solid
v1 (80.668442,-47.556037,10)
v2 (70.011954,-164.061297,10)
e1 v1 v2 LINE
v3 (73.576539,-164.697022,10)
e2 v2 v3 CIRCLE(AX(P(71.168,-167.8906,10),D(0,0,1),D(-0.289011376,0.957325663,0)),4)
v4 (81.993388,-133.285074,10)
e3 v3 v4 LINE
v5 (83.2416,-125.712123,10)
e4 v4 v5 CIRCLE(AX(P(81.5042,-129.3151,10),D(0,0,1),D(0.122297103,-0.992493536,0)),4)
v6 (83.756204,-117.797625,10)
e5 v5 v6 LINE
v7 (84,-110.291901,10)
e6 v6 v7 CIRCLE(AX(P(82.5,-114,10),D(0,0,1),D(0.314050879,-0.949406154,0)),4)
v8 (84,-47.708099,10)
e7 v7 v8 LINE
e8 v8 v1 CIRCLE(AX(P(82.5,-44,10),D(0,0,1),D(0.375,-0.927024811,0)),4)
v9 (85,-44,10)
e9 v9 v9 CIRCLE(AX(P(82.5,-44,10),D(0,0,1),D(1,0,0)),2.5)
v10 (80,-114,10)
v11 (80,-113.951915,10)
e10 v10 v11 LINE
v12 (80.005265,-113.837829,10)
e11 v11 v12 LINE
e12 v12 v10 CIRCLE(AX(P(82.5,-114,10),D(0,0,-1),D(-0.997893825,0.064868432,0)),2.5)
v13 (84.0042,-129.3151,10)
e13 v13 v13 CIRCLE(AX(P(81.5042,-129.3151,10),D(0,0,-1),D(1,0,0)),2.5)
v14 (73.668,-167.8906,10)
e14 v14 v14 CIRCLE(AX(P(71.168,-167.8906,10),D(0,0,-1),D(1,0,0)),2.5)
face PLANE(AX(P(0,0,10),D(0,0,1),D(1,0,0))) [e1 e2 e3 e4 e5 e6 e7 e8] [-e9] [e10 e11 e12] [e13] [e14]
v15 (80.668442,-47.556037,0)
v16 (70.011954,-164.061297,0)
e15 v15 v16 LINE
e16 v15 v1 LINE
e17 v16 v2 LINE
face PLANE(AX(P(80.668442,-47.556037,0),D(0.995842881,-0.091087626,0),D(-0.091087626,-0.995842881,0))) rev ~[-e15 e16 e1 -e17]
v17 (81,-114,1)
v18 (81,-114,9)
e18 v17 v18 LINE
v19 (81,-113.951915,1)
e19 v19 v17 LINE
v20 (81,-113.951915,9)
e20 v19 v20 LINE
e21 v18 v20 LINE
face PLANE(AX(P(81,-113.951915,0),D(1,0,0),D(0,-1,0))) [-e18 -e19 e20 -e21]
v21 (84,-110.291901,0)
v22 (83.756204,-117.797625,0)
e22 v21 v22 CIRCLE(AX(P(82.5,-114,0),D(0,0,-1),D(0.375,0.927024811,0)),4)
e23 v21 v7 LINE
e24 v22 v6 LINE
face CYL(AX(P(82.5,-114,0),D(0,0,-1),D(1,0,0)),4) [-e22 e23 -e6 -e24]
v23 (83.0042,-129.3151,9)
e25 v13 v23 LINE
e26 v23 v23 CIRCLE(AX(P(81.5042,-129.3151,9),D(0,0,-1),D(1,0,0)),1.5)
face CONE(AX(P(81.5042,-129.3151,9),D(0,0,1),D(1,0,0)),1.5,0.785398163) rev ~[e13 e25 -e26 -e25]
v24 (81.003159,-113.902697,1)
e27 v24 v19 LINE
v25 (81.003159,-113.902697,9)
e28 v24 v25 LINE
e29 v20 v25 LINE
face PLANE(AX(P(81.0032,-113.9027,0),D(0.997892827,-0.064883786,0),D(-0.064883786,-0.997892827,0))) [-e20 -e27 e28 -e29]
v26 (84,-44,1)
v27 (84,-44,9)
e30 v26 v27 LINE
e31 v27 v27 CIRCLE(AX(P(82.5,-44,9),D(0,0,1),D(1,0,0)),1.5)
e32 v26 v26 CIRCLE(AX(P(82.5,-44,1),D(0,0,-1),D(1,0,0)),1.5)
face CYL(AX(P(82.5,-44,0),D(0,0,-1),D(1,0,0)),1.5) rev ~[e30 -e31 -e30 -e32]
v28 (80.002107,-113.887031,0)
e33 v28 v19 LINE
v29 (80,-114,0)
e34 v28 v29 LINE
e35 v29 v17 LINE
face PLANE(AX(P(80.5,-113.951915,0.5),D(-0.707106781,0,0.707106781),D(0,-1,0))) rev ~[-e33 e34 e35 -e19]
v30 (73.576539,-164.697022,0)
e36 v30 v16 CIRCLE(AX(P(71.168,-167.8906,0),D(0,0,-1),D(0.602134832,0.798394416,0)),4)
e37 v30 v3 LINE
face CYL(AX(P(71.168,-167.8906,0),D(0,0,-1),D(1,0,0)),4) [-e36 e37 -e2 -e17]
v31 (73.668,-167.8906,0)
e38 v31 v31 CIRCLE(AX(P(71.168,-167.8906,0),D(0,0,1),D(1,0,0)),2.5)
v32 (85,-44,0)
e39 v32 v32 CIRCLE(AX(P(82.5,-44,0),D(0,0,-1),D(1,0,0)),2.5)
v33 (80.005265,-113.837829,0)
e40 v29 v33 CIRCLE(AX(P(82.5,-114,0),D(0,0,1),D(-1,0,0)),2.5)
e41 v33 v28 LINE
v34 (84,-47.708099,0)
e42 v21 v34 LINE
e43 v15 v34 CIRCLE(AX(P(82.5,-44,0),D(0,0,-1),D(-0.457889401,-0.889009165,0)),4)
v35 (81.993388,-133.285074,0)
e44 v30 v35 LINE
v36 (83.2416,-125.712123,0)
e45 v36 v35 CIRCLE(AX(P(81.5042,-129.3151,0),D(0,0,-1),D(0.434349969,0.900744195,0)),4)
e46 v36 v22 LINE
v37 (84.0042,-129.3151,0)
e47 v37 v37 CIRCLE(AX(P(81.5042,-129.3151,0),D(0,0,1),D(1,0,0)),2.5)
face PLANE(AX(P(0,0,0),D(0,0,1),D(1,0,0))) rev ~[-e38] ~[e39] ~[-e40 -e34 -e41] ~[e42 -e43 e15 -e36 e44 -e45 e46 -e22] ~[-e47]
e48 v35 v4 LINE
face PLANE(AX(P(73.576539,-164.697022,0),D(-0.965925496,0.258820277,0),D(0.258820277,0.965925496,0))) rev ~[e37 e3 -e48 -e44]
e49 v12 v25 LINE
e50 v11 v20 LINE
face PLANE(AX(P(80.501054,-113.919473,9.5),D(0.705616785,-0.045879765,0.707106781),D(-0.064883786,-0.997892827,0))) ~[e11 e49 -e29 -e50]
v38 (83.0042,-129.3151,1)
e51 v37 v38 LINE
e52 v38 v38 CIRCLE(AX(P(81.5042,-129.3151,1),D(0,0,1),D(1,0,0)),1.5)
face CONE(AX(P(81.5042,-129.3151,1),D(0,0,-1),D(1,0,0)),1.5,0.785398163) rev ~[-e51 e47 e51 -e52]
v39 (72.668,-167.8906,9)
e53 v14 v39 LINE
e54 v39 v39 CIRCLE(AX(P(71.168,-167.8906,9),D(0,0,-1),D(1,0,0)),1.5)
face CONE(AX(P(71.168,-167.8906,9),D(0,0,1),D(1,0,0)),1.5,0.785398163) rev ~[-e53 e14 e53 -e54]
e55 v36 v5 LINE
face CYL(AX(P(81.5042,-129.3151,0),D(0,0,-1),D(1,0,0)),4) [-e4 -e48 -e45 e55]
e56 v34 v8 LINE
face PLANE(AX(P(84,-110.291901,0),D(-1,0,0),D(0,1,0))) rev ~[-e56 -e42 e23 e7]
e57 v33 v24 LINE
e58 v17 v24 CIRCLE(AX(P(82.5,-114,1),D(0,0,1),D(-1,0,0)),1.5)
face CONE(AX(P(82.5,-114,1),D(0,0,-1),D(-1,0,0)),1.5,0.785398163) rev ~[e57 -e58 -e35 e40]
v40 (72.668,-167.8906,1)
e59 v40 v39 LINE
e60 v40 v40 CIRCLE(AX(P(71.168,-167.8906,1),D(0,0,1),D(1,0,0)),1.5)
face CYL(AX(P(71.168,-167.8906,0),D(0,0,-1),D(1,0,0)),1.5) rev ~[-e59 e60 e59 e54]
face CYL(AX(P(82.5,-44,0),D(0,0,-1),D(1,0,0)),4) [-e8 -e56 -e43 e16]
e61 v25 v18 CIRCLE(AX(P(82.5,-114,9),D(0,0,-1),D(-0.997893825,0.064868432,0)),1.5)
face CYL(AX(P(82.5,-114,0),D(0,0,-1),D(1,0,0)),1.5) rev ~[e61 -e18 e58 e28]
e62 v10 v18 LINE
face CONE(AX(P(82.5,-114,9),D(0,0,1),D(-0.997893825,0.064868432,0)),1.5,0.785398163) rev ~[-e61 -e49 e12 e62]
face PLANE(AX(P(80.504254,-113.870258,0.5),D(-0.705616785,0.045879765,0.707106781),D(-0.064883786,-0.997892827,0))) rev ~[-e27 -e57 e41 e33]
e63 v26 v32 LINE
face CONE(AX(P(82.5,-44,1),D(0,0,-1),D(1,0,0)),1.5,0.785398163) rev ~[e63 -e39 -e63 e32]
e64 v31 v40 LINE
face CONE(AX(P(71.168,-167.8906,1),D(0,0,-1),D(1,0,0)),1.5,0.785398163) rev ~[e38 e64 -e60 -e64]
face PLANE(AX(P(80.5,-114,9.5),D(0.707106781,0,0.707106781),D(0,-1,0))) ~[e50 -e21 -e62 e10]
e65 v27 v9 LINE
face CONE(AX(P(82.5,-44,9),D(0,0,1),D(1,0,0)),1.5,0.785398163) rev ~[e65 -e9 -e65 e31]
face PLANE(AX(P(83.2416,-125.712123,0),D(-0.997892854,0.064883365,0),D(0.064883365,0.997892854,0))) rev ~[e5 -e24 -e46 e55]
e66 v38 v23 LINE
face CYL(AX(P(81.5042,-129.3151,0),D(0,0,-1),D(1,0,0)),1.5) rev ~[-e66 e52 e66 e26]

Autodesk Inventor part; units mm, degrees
ref_plane "YZ Plane" through (0, 0, 0) normal (1, 0, 0) x (0, 1, 0)
ref_plane "XZ Plane" through (0, 0, 0) normal (0, 1, 0) x (-1, 0, 0)
ref_plane "XY Plane" through (0, 0, 0) normal (0, 0, 1) x (1, 0, 0)
sketch "Эскиз1" plane through (0, 0, 0) normal (0, 0, 1) x (1, 0, 0)
  circle A0 centre (82.5, -44) radius 1.5 projected
  circle A1 centre (82.5, -114) radius 1.5 projected
  circle A2 centre (81.5042, -129.3151) radius 1.5 projected
  circle A3 centre (71.168, -167.8906) radius 1.5 projected
  line L0 (82.5, -44) -> (82.5, -114) construction
  line L1 (81, -44) -> (81, -114)
  line L2 (84, -114) -> (84, -44)
  arc A4 (84, -44) -> (81, -44) centre (82.5, -44) ccw
  arc A5 (81, -114) -> (84, -114) centre (82.5, -114) ccw
  line L3 (82.5, -114) -> (81.5042, -129.3151) construction
  line L4 (81.0032, -113.9027) -> (80.0074, -129.2178)
  line L5 (83.001, -129.4125) -> (83.9968, -114.0973)
  arc A6 (83.9968, -114.0973) -> (81.0032, -113.9027) centre (82.5, -114) ccw
  arc A7 (80.0074, -129.2178) -> (83.001, -129.4125) centre (81.5042, -129.3151) ccw
  line L6 (81.5042, -129.3151) -> (71.168, -167.8906) construction
  line L7 (80.0553, -128.9269) -> (69.7191, -167.5023)
  line L8 (72.6168, -168.2788) -> (82.9531, -129.7034)
  arc A8 (82.9531, -129.7034) -> (80.0553, -128.9269) centre (81.5042, -129.3151) ccw
  arc A9 (69.7191, -167.5023) -> (72.6168, -168.2788) centre (71.168, -167.8906) ccw
  line L9 (82.5, -44) -> (71.168, -167.8906) construction
  line L10 (81.0062, -43.8634) -> (69.6742, -167.7539)
  line L11 (72.6617, -168.0272) -> (83.9938, -44.1366)
  arc A10 (83.9938, -44.1366) -> (81.0062, -43.8634) centre (82.5, -44) ccw
  arc A11 (69.6742, -167.7539) -> (72.6617, -168.0272) centre (71.168, -167.8906) ccw
  circle A12 centre (82.5, -44) radius 4
  circle A13 centre (82.5, -114) radius 4
  circle A14 centre (81.5042, -129.3151) radius 4
  circle A15 centre (71.168, -167.8906) radius 4
  point P0 (0, 0)
  point P1 (82.5, -79)
  point P2 (82.0021, -121.6576)
  point P3 (76.3361, -148.6029)
  point P4 (76.834, -105.9453)
  point P5 (84, -47.7081)
  point P6 (80.6685, -47.5561)
  point P7 (70.0119, -164.0613)
  point P8 (73.5766, -164.697)
  point P9 (81.9934, -133.2851)
  point P10 (83.2416, -125.7122)
  point P11 (83.7562, -117.7976)
  point P12 (84, -110.2919)
  dimension "d0" = 1.5
  dimension "d1" = 8
  dimension "d2" = 8
  dimension "d3" = 8
  dimension "d4" = 8
extrude "Выдавливание1" add sketch "Эскиз1" along normal blind 10 contours L2 A12 L11 A0 | A0 L10 A12 L2 | A0 L1 A12 L10 | L11 A12 L1 A0 | L2 A13 L1 L11 A12 | A12 L1 L11 L7 A15 L10 | L11 L1 A12 | A13 L5 A1 L2 | L2 A1 L1 A13 | A15 L7 A3 L10 | L10 A3 L8 A15 | L1 A13 L4 A14 L7 L11 | L1 L4 A13 | A15 L11 A3 L7 | L7 L11 A15 | L7 A14 L8 A15 L11 | L5 A13 L4 A1 | L5 A14 L4 A13 | A3 L11 A15 L8 | A14 L4 L7 | L7 L4 A2 L8 A14 | A14 L8 A2 L5 | L5 A2 L7 L4 A14 | L7 A2 L4
chamfer "Фаска1" distance 1 angle 45 8 edges at (81, -44, 10) (81, -114, 10) (80.0042, -129.3151, 10) (69.668, -167.8906, 10) (80.0042, -129.3151, 0) (81, -114, 0) (81, -44, 0) (69.668, -167.8906, 0)
properties part number "Шаблон2"
